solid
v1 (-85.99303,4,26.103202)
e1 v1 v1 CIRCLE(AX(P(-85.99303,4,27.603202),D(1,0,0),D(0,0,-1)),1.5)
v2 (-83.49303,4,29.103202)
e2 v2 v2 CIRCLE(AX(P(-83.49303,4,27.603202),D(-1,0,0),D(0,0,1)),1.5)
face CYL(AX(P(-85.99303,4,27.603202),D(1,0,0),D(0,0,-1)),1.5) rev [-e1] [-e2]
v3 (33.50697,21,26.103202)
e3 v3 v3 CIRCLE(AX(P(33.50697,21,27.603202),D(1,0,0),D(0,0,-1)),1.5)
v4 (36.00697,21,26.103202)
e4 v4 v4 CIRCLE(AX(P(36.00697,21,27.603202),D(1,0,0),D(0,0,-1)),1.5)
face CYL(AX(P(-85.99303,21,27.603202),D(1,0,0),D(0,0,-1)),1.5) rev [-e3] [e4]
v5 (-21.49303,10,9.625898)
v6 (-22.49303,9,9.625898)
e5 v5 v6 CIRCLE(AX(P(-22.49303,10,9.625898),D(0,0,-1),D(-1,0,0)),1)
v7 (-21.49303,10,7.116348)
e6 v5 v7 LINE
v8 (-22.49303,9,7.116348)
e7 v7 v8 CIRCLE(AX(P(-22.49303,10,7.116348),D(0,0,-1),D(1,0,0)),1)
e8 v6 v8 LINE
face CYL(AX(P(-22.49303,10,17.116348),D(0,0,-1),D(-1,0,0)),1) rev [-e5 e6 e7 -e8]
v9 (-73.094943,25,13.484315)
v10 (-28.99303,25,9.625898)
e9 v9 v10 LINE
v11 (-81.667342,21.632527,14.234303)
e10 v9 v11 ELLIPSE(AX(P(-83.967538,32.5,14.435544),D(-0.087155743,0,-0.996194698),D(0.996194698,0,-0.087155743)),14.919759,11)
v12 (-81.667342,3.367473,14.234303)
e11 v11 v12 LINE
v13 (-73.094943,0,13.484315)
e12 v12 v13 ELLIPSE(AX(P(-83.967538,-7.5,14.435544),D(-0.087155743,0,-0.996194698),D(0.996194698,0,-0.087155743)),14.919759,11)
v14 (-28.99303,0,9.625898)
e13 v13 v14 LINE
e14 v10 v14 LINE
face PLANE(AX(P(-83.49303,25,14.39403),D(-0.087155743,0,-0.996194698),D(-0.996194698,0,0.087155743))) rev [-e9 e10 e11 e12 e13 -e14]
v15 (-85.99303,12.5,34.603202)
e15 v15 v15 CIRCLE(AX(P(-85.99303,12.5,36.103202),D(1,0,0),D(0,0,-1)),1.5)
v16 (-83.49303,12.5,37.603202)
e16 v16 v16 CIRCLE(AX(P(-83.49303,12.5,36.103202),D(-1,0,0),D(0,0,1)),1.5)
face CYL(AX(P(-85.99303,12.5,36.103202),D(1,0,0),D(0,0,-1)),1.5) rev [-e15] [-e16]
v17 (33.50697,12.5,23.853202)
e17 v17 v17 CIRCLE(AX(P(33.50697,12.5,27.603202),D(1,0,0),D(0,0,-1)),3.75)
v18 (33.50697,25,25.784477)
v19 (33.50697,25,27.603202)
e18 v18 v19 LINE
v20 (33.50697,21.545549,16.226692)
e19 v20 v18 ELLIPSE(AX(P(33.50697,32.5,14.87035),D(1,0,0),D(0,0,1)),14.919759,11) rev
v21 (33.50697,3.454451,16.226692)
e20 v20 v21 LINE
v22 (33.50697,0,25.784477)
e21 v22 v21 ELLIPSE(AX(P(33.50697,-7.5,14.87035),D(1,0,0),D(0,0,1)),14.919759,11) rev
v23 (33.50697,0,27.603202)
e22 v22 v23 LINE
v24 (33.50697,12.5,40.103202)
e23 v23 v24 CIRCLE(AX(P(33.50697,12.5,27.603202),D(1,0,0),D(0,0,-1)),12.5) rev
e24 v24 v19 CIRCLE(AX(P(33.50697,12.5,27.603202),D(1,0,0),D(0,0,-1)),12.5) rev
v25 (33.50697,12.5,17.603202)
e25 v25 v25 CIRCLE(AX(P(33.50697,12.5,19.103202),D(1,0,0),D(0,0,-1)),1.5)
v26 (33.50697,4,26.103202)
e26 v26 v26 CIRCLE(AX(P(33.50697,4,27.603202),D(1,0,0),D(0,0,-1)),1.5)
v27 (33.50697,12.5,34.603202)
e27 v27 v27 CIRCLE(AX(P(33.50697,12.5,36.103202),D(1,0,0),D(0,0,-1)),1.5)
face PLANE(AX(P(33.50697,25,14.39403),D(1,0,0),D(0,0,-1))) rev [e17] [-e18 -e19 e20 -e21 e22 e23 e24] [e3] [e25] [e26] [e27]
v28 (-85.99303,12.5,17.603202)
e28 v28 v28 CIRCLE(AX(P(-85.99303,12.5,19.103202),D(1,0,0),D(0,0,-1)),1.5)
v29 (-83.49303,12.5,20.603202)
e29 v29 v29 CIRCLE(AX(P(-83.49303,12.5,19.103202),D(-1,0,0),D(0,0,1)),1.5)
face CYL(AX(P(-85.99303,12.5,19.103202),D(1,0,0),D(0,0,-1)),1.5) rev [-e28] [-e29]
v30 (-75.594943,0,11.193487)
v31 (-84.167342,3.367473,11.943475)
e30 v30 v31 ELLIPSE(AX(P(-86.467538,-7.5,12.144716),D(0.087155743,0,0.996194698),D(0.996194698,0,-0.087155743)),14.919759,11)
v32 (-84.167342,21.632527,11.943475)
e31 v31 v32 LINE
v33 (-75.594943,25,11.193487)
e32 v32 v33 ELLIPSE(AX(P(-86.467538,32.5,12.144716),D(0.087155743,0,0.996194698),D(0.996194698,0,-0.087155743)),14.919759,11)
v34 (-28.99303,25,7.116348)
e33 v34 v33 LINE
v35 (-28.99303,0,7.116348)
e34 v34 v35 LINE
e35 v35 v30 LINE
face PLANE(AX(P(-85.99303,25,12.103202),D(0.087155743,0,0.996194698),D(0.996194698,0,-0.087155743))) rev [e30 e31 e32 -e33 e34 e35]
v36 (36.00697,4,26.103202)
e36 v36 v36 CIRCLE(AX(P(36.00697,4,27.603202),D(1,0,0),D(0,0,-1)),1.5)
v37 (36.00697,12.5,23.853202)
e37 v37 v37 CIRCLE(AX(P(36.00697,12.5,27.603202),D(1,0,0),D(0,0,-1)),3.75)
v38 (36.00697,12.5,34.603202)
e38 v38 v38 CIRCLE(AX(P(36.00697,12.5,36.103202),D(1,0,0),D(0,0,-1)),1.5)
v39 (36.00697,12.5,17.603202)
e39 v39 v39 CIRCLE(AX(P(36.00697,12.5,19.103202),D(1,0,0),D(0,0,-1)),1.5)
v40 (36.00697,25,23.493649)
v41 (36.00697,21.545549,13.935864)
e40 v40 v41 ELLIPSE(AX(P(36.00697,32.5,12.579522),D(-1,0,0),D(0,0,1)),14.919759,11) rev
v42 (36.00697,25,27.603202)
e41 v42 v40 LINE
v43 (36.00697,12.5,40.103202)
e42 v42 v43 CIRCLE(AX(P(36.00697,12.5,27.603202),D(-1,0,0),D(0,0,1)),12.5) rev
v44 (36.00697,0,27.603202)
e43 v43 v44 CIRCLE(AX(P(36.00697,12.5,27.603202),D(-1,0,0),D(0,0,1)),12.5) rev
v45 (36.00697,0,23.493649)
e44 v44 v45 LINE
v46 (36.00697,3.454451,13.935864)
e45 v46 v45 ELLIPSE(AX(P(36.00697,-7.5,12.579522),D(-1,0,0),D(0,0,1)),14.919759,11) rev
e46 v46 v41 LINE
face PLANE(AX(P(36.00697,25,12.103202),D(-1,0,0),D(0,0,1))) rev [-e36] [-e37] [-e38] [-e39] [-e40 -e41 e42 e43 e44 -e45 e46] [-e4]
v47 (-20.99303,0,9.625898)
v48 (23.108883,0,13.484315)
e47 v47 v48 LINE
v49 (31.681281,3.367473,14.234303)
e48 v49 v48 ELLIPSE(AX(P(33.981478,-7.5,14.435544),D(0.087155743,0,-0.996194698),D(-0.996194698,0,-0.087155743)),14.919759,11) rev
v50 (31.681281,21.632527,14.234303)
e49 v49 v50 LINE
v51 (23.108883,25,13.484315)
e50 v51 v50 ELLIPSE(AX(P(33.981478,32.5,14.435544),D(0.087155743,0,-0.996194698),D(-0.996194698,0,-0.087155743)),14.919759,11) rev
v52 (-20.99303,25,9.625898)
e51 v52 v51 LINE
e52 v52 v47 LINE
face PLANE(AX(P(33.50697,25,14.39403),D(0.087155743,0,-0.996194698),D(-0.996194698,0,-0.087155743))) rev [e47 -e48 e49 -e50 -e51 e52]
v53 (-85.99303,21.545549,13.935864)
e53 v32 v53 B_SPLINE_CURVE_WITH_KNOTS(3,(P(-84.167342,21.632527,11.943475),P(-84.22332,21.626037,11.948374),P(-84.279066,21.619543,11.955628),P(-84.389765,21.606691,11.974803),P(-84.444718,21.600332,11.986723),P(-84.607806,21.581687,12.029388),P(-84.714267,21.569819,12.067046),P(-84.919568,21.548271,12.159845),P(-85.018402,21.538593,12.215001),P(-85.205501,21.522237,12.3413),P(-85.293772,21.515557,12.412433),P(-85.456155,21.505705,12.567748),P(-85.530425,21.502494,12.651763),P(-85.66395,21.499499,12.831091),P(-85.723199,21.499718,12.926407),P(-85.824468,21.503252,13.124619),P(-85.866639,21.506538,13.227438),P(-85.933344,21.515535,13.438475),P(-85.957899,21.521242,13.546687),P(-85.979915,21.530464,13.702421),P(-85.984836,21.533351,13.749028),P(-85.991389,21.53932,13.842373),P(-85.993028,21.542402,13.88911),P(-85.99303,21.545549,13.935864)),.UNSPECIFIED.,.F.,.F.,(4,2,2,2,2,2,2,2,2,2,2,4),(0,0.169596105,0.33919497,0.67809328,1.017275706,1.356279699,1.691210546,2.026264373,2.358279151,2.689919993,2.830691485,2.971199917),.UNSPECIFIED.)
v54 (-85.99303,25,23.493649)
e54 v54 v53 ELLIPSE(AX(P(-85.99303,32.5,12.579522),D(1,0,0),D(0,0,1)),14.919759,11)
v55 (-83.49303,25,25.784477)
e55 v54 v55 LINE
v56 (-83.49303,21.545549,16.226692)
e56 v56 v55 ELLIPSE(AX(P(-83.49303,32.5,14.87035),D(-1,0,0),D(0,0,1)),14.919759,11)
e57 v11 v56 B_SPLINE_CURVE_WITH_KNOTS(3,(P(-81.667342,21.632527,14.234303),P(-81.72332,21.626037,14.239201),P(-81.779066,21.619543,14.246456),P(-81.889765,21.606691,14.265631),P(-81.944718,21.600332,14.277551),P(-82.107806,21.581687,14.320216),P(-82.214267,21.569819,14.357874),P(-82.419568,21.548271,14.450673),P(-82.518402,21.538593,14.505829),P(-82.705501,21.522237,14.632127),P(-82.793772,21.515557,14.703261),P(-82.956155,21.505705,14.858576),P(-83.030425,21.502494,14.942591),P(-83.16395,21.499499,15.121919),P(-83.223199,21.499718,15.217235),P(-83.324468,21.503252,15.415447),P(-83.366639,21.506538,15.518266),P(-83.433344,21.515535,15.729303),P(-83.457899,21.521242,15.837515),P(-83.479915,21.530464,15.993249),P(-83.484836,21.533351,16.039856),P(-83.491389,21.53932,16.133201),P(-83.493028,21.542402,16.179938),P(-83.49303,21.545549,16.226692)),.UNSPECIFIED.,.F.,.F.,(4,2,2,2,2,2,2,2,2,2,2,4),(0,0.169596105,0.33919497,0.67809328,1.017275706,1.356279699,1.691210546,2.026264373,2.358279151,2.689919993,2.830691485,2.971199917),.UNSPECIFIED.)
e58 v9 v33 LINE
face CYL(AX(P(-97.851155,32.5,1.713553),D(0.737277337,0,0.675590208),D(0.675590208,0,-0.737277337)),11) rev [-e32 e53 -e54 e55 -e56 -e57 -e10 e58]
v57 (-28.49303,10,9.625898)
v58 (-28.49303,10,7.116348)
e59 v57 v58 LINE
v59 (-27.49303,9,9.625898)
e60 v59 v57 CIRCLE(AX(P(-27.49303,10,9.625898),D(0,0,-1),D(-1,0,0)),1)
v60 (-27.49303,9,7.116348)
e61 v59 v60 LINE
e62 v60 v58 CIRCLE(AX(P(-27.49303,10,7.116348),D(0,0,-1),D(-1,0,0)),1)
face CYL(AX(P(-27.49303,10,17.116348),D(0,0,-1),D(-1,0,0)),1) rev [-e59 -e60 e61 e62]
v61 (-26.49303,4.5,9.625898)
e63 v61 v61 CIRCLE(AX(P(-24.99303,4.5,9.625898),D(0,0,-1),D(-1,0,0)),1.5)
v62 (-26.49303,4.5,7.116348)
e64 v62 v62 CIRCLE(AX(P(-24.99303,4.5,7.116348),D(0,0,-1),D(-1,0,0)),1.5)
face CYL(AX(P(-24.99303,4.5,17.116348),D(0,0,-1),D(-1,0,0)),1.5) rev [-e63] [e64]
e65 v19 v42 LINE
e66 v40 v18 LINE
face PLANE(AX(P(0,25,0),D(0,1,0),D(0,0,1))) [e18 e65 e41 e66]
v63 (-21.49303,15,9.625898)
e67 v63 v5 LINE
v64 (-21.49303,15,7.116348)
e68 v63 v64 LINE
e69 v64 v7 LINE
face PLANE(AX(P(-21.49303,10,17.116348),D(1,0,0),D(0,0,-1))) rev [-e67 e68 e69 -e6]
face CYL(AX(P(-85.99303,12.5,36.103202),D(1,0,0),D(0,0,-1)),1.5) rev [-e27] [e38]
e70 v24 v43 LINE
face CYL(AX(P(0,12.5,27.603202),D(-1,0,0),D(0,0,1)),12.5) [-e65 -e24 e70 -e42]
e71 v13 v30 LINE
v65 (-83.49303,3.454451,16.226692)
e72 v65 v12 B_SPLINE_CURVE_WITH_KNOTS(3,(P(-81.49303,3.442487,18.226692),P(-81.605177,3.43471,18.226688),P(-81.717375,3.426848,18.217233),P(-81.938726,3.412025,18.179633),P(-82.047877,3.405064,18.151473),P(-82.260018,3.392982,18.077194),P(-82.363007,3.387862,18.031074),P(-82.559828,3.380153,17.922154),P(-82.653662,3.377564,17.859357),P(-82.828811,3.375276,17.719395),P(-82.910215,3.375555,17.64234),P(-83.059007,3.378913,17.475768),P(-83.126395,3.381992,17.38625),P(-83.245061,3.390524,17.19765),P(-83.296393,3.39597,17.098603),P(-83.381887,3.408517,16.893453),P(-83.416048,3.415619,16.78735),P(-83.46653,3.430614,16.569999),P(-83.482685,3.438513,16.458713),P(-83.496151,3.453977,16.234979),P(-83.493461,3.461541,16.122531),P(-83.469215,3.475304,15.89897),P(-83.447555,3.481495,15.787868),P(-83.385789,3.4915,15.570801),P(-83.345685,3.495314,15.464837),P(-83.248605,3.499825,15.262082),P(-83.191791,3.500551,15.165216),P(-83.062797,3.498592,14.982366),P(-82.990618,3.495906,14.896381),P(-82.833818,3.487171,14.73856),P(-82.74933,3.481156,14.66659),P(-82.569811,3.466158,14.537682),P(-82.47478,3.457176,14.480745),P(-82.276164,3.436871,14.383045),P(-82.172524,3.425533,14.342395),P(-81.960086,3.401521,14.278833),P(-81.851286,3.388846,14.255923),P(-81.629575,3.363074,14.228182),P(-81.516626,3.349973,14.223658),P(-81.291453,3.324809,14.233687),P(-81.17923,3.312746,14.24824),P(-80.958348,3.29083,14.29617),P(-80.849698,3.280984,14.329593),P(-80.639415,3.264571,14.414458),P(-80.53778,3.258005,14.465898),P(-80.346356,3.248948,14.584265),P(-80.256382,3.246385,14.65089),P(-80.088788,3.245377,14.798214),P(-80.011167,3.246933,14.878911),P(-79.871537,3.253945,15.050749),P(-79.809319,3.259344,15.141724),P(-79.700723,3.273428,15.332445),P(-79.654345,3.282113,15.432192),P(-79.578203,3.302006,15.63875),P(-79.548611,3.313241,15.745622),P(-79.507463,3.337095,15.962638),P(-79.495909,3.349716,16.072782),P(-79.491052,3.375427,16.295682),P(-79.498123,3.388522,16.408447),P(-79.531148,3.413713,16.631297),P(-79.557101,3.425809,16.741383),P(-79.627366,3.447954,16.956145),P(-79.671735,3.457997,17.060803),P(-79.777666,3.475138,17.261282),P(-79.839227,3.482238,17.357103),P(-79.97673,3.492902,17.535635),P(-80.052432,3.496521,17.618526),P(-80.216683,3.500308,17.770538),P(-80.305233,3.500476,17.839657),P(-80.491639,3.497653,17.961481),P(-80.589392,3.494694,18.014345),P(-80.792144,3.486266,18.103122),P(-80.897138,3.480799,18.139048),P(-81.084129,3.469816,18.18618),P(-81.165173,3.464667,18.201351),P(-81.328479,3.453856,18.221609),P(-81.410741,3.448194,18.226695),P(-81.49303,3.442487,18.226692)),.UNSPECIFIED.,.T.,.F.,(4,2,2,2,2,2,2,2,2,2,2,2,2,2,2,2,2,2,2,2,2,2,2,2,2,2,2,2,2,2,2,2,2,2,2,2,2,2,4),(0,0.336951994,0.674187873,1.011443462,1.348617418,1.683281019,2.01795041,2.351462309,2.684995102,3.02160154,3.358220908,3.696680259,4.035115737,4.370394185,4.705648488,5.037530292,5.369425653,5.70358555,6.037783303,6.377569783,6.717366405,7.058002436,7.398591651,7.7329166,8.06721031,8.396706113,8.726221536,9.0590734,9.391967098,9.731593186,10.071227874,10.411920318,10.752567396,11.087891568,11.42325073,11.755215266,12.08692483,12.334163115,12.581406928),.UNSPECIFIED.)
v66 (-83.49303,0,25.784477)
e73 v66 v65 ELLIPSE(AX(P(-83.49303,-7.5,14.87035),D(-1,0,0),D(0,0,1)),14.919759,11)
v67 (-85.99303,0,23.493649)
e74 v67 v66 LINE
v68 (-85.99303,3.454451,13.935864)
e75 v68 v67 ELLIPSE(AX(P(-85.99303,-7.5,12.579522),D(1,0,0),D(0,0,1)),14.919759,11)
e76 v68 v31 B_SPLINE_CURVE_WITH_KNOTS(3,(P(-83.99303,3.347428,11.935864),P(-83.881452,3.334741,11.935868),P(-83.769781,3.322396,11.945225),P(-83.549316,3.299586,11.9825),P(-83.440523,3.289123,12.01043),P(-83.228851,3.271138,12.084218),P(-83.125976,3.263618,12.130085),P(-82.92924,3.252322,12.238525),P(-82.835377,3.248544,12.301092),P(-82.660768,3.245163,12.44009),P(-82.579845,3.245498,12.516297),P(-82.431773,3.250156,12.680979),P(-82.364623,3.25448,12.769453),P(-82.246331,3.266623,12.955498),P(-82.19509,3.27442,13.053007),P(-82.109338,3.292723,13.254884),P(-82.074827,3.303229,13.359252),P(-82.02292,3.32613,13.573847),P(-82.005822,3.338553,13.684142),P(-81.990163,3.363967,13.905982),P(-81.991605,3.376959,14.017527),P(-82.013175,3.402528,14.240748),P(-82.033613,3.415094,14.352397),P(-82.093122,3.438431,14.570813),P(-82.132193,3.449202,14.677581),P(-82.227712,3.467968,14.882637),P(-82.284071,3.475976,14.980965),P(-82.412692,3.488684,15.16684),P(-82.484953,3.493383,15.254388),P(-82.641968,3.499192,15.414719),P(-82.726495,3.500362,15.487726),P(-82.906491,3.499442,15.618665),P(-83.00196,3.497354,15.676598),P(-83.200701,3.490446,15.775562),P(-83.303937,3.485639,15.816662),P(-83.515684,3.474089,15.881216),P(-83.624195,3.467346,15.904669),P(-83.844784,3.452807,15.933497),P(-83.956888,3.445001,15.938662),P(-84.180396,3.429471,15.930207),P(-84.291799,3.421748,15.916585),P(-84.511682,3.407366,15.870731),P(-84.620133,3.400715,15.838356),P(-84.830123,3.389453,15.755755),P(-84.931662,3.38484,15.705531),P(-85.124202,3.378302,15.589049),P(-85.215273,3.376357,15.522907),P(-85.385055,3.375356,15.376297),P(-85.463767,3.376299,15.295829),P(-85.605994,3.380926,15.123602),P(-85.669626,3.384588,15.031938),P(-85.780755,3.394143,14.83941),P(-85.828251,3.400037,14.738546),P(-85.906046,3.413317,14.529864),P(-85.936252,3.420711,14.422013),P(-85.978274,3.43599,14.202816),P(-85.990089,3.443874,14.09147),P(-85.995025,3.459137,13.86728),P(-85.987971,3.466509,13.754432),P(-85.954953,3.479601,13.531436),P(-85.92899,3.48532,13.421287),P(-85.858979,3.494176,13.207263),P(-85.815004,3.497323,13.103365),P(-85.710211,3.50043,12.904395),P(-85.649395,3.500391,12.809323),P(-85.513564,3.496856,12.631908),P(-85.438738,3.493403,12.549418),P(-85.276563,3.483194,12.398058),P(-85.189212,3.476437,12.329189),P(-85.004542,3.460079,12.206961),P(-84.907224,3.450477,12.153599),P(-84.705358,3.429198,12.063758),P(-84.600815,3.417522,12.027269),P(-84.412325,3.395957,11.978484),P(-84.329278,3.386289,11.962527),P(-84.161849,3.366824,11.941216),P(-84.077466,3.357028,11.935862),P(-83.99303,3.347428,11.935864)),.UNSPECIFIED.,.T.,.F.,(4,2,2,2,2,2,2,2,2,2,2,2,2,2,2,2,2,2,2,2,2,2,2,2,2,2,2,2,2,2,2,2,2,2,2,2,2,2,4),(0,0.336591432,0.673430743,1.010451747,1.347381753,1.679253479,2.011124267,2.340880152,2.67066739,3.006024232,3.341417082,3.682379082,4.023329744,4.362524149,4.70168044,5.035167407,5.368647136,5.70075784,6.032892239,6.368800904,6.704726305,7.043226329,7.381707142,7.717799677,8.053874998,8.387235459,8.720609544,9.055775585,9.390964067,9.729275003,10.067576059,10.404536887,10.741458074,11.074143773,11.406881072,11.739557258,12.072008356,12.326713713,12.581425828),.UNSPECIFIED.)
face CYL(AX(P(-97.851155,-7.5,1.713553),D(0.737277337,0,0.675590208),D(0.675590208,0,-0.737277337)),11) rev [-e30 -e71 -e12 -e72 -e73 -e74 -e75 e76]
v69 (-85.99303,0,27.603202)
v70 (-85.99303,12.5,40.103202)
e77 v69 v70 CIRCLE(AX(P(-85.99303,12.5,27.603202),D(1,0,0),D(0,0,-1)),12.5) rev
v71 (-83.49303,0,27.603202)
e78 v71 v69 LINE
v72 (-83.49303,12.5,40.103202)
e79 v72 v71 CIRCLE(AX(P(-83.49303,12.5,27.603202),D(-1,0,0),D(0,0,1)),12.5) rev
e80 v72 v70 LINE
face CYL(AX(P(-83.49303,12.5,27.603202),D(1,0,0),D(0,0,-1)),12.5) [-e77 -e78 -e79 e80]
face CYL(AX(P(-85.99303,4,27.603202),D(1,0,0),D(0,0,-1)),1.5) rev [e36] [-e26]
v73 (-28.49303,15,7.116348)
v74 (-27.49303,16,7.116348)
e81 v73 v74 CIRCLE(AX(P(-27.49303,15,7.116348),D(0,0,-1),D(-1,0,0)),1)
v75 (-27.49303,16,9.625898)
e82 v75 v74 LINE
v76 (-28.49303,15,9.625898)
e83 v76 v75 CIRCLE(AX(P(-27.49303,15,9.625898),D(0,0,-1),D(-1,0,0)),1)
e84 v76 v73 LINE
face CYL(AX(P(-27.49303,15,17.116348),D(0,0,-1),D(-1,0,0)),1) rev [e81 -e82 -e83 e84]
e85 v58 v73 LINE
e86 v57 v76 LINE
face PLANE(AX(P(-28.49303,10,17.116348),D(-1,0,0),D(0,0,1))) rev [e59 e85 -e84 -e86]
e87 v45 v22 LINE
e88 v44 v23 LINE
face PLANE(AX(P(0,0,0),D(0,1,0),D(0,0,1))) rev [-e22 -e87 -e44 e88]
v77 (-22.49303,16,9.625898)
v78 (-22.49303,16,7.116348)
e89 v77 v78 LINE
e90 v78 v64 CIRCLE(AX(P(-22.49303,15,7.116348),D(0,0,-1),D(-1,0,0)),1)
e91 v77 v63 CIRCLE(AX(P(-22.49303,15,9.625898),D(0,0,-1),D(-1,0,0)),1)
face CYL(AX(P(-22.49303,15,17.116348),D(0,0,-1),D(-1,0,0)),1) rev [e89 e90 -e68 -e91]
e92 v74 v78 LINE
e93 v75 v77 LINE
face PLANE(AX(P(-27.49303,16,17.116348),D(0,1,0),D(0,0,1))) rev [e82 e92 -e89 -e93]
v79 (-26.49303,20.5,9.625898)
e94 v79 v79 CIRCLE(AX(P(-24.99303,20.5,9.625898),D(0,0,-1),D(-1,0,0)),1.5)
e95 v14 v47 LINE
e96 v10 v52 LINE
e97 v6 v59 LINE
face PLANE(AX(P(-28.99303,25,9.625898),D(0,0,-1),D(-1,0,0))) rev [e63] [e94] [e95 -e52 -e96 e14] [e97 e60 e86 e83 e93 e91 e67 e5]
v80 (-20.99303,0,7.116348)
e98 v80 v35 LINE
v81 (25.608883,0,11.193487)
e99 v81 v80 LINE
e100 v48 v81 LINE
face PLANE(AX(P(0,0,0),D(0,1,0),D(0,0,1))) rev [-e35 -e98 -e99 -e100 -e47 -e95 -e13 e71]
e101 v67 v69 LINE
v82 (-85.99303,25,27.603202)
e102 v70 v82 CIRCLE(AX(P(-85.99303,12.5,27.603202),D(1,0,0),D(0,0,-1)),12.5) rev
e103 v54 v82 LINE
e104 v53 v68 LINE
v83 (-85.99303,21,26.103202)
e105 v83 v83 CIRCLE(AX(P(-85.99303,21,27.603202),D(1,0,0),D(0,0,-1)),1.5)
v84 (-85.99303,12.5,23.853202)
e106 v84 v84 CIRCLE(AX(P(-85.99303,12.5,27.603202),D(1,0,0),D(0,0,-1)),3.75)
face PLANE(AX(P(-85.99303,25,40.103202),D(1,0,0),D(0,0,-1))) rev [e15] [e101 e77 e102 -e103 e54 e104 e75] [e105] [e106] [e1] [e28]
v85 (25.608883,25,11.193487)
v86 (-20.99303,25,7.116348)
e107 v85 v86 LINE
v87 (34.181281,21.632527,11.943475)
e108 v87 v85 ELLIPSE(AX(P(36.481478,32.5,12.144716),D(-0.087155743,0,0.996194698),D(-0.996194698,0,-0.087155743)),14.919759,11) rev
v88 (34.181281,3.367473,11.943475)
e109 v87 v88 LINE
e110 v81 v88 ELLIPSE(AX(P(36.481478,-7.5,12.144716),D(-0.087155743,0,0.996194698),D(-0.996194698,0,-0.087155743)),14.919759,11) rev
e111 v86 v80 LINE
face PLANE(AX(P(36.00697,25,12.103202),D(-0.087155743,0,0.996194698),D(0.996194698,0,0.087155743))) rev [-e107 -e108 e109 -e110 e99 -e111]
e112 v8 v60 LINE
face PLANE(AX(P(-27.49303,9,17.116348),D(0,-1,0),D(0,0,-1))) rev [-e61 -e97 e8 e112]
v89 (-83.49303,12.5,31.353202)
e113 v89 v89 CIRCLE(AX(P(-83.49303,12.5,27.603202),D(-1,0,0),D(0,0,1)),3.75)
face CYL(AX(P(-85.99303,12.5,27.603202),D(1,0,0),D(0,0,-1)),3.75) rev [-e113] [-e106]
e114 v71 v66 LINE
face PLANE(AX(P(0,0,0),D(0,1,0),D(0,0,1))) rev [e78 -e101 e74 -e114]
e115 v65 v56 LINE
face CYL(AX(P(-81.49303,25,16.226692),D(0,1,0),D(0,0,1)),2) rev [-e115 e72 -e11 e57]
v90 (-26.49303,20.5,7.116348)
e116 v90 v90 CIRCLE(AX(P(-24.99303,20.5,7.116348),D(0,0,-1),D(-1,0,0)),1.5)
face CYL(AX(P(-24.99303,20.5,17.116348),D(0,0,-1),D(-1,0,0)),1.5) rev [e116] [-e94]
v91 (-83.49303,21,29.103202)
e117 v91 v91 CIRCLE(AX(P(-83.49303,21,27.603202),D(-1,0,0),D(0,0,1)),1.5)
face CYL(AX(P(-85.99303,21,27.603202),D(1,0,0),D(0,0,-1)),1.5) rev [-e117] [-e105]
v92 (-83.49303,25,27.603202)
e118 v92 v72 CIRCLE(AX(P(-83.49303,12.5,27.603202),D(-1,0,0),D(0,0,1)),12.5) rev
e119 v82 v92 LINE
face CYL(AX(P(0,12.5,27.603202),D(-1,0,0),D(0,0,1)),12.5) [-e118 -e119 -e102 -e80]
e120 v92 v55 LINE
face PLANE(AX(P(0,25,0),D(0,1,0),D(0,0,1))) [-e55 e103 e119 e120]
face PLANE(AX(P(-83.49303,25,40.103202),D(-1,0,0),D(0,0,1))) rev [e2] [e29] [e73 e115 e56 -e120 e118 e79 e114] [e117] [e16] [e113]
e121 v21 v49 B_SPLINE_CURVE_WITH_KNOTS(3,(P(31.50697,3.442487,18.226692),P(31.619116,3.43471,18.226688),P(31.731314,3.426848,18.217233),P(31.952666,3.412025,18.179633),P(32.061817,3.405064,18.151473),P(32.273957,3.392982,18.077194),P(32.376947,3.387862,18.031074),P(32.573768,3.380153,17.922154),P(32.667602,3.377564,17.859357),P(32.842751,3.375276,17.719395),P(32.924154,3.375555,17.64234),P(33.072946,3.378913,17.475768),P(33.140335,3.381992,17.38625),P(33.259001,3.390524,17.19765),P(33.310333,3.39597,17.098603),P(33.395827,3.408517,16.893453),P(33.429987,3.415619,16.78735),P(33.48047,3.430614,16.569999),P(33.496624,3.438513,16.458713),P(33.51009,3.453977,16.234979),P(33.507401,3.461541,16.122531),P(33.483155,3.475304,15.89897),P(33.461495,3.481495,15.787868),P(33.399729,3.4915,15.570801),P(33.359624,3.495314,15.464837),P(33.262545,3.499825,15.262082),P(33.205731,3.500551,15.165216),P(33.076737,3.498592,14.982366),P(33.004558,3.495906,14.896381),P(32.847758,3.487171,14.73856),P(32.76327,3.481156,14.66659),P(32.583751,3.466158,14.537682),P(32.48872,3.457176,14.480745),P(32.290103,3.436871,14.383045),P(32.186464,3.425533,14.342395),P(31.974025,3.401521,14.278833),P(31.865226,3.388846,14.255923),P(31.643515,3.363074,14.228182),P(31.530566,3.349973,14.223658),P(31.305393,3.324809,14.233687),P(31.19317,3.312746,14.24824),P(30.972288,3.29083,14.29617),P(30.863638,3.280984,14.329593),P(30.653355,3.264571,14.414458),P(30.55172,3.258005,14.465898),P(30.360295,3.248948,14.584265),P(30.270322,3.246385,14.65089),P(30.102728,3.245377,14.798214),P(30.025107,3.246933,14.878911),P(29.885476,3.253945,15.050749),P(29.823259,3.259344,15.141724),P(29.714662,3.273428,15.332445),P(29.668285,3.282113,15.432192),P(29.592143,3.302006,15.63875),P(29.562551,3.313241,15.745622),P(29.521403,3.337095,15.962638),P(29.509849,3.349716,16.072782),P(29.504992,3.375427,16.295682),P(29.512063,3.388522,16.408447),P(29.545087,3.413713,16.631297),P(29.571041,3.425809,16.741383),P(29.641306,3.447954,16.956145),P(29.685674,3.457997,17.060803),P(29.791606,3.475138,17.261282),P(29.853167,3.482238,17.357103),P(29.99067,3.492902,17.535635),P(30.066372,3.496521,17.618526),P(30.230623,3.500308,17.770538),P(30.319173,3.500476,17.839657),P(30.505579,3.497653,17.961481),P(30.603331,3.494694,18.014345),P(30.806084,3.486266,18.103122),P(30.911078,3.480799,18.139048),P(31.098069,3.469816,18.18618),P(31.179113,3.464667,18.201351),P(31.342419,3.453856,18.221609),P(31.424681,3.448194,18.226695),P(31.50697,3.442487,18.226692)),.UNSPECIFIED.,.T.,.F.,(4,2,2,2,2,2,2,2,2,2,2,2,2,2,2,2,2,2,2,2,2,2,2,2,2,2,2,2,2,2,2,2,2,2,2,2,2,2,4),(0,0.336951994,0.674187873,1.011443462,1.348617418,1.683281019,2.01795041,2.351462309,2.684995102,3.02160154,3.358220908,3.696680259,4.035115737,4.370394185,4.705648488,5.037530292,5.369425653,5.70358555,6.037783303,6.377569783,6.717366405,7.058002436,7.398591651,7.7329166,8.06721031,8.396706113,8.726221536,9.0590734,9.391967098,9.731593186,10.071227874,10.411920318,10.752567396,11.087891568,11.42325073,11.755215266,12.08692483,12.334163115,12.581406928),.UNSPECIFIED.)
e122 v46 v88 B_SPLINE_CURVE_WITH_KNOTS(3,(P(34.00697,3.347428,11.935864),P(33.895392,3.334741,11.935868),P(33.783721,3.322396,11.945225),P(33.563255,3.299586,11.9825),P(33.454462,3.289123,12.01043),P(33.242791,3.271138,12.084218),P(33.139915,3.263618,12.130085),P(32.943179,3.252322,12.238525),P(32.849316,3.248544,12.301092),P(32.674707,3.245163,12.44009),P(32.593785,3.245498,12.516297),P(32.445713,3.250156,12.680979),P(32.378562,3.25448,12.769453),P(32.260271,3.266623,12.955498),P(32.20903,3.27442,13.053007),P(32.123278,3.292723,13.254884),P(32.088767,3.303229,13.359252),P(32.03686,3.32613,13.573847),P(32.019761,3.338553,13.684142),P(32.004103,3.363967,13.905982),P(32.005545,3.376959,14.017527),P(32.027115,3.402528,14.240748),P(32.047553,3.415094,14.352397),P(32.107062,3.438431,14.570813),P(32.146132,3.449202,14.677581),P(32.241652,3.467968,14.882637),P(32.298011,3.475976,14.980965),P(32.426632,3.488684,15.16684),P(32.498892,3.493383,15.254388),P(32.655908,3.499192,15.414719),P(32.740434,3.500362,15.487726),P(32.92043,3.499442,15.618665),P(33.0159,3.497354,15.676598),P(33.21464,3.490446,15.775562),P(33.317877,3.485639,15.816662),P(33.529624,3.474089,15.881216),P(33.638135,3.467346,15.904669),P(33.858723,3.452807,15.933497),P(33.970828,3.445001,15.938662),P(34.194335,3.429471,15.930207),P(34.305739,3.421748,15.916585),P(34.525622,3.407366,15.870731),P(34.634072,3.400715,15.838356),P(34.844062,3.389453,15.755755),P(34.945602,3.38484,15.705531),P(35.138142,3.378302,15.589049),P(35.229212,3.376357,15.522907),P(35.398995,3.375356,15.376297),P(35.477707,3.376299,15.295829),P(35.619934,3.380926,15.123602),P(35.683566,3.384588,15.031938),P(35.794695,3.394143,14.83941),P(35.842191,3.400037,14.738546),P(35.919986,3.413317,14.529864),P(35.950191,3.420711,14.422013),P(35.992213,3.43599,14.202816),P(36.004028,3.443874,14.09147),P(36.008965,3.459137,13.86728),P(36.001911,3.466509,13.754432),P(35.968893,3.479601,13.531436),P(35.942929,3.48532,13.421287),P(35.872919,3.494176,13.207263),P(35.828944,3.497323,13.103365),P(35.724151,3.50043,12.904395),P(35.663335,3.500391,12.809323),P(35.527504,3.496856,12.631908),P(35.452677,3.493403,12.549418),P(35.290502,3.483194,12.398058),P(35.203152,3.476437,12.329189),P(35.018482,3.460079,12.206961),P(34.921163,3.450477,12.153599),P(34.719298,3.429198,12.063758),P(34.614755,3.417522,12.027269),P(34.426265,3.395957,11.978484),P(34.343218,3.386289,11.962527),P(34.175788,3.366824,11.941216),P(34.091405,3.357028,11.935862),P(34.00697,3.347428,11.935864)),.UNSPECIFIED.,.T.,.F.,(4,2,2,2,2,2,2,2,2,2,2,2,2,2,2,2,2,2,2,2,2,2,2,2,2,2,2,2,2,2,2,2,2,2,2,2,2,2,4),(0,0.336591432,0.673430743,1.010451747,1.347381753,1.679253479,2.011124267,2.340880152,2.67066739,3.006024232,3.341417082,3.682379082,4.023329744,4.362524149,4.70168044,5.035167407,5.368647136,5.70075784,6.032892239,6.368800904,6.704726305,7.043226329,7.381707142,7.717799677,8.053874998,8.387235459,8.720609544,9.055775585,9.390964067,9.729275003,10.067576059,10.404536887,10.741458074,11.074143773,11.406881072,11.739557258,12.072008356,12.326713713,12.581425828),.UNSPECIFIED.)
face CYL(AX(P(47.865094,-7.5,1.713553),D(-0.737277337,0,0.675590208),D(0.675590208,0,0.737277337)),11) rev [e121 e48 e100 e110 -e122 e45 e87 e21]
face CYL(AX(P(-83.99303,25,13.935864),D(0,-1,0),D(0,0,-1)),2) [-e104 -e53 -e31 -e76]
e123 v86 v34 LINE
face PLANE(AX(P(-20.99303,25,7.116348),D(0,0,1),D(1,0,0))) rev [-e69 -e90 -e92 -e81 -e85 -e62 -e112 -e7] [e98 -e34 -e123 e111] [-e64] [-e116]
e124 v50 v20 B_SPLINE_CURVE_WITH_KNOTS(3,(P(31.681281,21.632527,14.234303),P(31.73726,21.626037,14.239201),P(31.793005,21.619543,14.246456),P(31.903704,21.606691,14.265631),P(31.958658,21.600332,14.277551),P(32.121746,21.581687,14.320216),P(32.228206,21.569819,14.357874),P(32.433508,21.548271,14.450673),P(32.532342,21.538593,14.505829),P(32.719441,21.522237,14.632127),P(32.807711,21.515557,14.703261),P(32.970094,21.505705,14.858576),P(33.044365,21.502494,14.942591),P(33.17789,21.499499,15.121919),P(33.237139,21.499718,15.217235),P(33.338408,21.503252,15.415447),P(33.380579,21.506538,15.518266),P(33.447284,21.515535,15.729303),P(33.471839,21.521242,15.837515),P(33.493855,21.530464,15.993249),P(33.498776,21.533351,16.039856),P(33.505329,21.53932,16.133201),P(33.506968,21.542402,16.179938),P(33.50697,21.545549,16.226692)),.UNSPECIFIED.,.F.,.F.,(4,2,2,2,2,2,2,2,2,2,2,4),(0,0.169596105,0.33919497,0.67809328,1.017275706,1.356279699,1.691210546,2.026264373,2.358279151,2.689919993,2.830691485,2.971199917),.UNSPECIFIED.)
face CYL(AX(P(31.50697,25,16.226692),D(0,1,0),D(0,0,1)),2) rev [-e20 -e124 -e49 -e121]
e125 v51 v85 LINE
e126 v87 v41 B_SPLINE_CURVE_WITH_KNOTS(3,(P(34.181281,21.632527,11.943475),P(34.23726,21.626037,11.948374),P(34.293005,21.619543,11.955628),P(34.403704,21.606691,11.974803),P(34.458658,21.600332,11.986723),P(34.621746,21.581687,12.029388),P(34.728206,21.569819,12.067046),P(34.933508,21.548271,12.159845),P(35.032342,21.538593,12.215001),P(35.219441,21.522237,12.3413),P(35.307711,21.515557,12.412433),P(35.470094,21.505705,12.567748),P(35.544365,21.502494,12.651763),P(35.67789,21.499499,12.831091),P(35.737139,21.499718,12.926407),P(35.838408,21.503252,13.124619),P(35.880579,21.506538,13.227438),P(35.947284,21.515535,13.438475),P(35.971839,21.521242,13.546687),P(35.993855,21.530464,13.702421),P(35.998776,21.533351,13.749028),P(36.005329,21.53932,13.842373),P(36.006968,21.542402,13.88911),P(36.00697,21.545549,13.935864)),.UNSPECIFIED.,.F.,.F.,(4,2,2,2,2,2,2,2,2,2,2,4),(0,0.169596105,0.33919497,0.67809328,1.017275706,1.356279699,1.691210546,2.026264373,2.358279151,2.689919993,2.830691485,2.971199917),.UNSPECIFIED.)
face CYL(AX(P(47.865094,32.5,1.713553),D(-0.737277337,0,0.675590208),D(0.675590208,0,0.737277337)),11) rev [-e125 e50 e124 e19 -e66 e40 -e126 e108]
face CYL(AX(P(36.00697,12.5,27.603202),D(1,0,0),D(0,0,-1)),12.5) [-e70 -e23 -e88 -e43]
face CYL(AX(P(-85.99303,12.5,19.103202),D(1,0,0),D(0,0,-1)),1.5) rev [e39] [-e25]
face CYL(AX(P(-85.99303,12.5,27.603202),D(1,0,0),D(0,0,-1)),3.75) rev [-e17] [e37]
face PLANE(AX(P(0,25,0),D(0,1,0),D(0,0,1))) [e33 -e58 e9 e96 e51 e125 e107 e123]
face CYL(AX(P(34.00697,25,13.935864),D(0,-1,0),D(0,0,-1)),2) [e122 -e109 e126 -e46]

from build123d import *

# Parameters (mm, degrees)
RESSALTO_EXTRUS_O1_DEPTH = 25
FILETE1_R                = 12.5
FILETE2_R                = 2
ESBO_O2_R                = 1.5
CORTE_EXTRUS_O1_DEPTH    = 10
ESBO_O3_R                = 3.75
ESBO_O3_R_2              = 1.5
CORTE_EXTRUS_O2_DEPTH    = 131.832972904
ESBO_O4_R                = 11
CORTE_EXTRUS_O5_DEPTH    = 17


with BuildPart() as part:
    # Esboço1 → Ressalto-extrusão1 (new body)
    with BuildSketch(Plane(origin=(0, 0, 0), x_dir=(1, 0, 0), z_dir=(0, 1, 0))):
        Polygon((-83.493030157, -40.103201854), (-85.993030157, -40.103201854), (-85.993030157, -12.103201854), (-28.993030157, -7.116348033), (-20.993030157, -7.116348033), (36.006969843, -12.103201854), (36.006969843, -40.103201854), (33.506969843, -40.103201854), (33.506969843, -14.394029789), (-20.993030157, -9.625897627), (-28.993030157, -9.625897627), (-83.493030157, -14.394029789), align=None)
    extrude(amount=RESSALTO_EXTRUS_O1_DEPTH)

    # Filete1
    filete1_edges = [part.edges().sort_by_distance(p)[0] for p in [
        (34.756969843, 25, 40.103201854),
        (34.756969843, 0, 40.103201854),
        (-84.743030157, 0, 40.103201854),
        (-84.743030157, 25, 40.103201854),
    ]]
    fillet(filete1_edges, radius=FILETE1_R - 0.0001)  # a hair under: the kernel refuses the full size

    # Filete2
    filete2_edges = [part.edges().sort_by_distance(p)[0] for p in [
        (-85.993030157, 12.5, 12.103201854),
        (36.006969843, 12.5, 12.103201854),
        (33.506969843, 12.5, 14.394029789),
        (-83.493030157, 12.5, 14.394029789),
    ]]
    fillet(filete2_edges, radius=FILETE2_R)

    # Esboço2 → Corte-extrusão1 (cut)
    with BuildSketch(Plane(origin=(0, 0, 7.116348033), x_dir=(-1, 0, 0), z_dir=(0, 0, -1))):
        with Locations((24.993030157, 4.5)):
            Circle(ESBO_O2_R)
        with Locations((24.993030157, 20.5)):
            Circle(ESBO_O2_R)
        with BuildLine():
            Line((27.493030157, 9), (22.493030157, 9))
            ThreePointArc((22.493030157, 9), (21.785923376, 9.292893219), (21.493030157, 10))
            Line((21.493030157, 10), (21.493030157, 15))
            ThreePointArc((21.493030157, 15), (21.785923376, 15.707106781), (22.493030157, 16))
            Line((22.493030157, 16), (27.493030157, 16))
            ThreePointArc((27.493030157, 16), (28.200136938, 15.707106781), (28.493030157, 15))
            Line((28.493030157, 15), (28.493030157, 10))
            ThreePointArc((28.493030157, 10), (28.200136938, 9.292893219), (27.493030157, 9))
        make_face()
    extrude(amount=-CORTE_EXTRUS_O1_DEPTH, mode=Mode.SUBTRACT)

    # Esboço3 → Corte-extrusão2 (cut, through all)
    with BuildSketch(Plane(origin=(36.006969843, 0, 0), x_dir=(0, 0, -1), z_dir=(1, 0, 0))):
        with Locations((-27.603201854, 12.5)):
            Circle(ESBO_O3_R)
        with Locations((-36.103201854, 12.5)):
            Circle(ESBO_O3_R_2)
        with Locations((-19.103201854, 12.5)):
            Circle(ESBO_O3_R_2)
        with Locations((-27.603201854, 4)):
            Circle(ESBO_O3_R_2)
        with Locations((-27.603201854, 21)):
            Circle(ESBO_O3_R_2)
    extrude(amount=-CORTE_EXTRUS_O2_DEPTH, mode=Mode.SUBTRACT)

    # Esboço4 → Corte-extrusão5 (cut, symmetric)
    with BuildSketch(Plane(origin=(-39.80249127, 0, -36.472263554), x_dir=(0.6755902076156622, 0, -0.7372773368101223), z_dir=(0.7372773368101223, 0, 0.6755902076156622))):
        with Locations((-67.370645943, 32.5)):
            Circle(ESBO_O4_R)
        with Locations((-67.370645943, -7.5)):
            Circle(ESBO_O4_R)
    corte_extrus_o5 = extrude(amount=CORTE_EXTRUS_O5_DEPTH, both=True, mode=Mode.SUBTRACT)

    # Espelhar1: Corte-extrusão5 across plane
    add(corte_extrus_o5.mirror(Plane(origin=(-24.993030157, 0, 0), x_dir=(0, 0, 1), z_dir=(1, 0, 0))), mode=Mode.SUBTRACT)


solid = part.part
